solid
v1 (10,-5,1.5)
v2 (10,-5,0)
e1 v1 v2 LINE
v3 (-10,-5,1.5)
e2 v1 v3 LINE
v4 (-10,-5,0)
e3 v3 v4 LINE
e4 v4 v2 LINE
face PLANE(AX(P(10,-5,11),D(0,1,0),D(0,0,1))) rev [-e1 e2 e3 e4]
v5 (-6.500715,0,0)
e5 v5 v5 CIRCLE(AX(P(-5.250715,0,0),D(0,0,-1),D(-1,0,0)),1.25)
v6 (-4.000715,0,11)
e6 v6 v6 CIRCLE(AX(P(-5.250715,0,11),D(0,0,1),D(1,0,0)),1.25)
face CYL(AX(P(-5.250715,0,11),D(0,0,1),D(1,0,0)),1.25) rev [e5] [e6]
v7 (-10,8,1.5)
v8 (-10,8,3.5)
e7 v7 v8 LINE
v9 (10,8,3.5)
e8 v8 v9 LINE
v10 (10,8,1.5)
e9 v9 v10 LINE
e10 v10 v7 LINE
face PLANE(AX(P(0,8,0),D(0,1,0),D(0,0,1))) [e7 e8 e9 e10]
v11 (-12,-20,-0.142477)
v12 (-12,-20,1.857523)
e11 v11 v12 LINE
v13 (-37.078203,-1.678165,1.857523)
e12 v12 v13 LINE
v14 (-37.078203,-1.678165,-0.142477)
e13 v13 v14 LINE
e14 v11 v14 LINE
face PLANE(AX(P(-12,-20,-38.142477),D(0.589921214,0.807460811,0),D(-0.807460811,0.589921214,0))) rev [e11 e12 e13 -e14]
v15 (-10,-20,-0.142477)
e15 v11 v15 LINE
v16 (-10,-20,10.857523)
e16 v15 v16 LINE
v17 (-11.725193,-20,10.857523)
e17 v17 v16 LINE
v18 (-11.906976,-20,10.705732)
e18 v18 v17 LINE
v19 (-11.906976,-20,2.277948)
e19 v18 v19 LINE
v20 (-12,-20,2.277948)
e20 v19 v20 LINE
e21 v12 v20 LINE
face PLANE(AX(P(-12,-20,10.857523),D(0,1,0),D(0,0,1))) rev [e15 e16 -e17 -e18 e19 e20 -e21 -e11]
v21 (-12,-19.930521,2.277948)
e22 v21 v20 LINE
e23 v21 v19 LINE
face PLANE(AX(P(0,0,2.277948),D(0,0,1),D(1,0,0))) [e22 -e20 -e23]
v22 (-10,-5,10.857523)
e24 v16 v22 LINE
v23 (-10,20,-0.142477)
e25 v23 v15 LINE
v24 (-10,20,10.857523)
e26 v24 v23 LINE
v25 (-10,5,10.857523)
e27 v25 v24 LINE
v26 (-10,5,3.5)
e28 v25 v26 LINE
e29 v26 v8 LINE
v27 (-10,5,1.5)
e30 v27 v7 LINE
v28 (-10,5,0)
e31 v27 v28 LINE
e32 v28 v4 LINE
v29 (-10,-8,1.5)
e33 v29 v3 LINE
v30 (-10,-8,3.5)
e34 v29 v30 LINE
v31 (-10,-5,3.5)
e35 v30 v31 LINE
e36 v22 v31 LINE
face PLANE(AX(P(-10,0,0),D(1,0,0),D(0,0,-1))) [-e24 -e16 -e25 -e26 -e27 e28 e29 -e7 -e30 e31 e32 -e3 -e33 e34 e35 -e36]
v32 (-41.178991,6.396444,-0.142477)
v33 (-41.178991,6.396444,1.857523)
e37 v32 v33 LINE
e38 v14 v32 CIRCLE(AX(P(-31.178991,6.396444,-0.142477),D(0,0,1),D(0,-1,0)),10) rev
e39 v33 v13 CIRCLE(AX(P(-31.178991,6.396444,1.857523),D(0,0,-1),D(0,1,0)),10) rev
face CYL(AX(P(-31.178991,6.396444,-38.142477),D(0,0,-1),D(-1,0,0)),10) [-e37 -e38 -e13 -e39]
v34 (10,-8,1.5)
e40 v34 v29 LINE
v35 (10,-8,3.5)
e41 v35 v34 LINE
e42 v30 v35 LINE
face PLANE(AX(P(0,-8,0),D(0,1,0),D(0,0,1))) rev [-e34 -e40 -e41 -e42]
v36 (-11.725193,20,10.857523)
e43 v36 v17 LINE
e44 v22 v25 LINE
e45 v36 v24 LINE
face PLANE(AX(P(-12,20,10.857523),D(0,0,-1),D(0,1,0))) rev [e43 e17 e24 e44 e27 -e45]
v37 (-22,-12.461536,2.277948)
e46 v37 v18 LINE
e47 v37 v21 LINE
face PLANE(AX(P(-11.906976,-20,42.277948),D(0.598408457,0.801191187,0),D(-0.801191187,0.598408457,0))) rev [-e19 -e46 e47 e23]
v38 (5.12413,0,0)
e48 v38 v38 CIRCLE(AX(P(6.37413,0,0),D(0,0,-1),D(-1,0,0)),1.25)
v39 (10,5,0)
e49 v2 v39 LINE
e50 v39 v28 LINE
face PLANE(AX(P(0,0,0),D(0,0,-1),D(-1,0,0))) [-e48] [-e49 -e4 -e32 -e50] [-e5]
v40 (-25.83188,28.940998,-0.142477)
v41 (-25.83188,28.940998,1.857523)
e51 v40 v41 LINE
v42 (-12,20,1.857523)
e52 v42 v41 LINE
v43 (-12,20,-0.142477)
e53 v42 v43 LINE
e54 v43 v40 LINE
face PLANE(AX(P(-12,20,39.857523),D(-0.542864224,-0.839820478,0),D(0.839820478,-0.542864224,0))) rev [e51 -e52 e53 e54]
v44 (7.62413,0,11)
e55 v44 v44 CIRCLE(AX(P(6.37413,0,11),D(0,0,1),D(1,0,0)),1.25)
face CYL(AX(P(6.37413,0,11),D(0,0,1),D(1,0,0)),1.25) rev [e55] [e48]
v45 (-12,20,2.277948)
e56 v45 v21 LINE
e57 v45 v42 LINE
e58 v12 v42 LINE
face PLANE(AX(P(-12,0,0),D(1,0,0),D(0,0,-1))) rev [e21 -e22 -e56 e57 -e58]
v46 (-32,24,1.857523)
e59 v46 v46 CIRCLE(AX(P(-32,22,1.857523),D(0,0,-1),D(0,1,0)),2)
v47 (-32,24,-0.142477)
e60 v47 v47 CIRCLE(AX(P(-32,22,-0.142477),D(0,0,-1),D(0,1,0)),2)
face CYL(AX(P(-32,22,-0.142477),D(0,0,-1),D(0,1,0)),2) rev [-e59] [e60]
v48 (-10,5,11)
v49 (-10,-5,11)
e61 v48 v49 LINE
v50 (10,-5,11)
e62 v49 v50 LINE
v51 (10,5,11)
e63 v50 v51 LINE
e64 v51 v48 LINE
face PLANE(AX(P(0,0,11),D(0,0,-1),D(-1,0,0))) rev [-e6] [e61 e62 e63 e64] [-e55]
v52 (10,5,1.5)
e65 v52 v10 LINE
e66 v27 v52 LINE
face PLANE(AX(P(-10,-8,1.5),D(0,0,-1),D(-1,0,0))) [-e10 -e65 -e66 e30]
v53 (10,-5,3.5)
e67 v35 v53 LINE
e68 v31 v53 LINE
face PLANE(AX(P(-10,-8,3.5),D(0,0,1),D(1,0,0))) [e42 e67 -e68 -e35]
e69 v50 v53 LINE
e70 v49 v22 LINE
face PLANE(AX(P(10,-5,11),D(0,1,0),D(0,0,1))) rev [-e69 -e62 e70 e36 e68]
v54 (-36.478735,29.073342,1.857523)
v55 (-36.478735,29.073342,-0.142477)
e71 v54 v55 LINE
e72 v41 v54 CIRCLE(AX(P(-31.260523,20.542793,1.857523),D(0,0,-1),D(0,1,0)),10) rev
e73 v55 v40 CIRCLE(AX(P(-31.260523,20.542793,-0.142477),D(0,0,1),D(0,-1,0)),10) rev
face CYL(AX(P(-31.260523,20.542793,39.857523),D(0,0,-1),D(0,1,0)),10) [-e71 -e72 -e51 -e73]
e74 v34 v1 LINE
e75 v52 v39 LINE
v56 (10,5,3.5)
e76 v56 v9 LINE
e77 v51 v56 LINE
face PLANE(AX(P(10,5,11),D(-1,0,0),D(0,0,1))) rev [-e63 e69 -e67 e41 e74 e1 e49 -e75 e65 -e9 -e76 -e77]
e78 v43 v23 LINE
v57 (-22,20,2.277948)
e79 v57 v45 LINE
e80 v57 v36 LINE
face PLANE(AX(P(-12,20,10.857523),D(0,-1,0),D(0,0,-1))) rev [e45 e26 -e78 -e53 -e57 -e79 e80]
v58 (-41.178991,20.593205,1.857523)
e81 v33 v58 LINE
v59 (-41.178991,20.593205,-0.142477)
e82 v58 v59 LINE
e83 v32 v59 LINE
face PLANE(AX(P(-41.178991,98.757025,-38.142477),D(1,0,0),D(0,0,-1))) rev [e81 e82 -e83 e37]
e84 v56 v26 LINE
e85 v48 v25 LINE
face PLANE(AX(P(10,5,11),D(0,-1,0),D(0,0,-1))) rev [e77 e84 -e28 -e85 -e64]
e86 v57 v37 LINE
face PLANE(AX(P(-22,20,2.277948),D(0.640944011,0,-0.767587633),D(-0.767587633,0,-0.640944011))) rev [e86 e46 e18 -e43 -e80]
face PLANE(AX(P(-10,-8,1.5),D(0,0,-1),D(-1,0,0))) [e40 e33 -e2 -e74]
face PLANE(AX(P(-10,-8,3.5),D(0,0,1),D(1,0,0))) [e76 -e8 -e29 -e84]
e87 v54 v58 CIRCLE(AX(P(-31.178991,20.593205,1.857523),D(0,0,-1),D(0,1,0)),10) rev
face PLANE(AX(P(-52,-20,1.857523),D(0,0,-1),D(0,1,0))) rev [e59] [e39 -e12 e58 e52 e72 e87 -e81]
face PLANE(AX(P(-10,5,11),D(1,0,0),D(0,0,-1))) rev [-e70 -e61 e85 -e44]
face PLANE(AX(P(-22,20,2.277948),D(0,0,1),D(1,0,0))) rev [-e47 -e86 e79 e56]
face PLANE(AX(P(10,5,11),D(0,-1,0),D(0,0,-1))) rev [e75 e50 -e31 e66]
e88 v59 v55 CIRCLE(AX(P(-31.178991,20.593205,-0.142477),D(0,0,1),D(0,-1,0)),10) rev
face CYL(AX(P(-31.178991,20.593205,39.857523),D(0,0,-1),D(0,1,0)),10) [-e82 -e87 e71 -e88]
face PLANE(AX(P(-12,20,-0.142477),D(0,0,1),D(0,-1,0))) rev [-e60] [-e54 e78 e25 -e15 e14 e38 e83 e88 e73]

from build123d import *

# Parameters (mm, degrees)
SKETCH1_W                = 20
SKETCH1_H                = 10
BOSS_EXTRUDE1_DEPTH      = 11
BOSS_EXTRUDE2_DEPTH      = 3
BOSS_EXTRUDE2_DEPTH_BACK = 13
SKETCH2_W                = 20
SKETCH2_H                = 2
SKETCH3_W                = 11
SKETCH3_H                = 40
BOSS_EXTRUDE3_DEPTH      = 2
SKETCH5_W                = 2
SKETCH5_H                = 60
BOSS_EXTRUDE4_DEPTH      = 40
F_4_0MM_DOWEL_SLOT1_D    = 4
CUT_EXTRUDE1_DEPTH       = 40
CUT_EXTRUDE2_DEPTH       = 40
FILLET1_R                = 10
SKETCH11_W               = 53.631829023
SKETCH11_H               = 118.756200052
CUT_EXTRUDE3_DEPTH       = 40
FILLET2_R                = 10
SKETCH12_W               = 8.579575143
SKETCH12_H               = 40
BOSS_EXTRUDE5_DEPTH      = 10
CUT_EXTRUDE4_DEPTH       = 40
CUT_EXTRUDE5_DEPTH       = 40
F_2_5MM_DOWEL_SLOT1_D    = 2.5


with BuildPart() as part:
    # Sketch1 → Boss-Extrude1 (new body)
    with BuildSketch(Plane.XY):
        Rectangle(SKETCH1_W, SKETCH1_H)
    extrude(amount=BOSS_EXTRUDE1_DEPTH)

    # Sketch2 → Boss-Extrude2 (add, two sides: drawn at the far end of the back side and taken through both)
    with BuildSketch(Plane(origin=(0, 5, 0), x_dir=(1, 0, 0), z_dir=(0, 1, 0)).offset(-BOSS_EXTRUDE2_DEPTH_BACK)):
        with Locations((0, -2.5)):
            Rectangle(SKETCH2_W, SKETCH2_H)
    extrude(amount=BOSS_EXTRUDE2_DEPTH + BOSS_EXTRUDE2_DEPTH_BACK)

    # Sketch3 → Boss-Extrude3 (add)
    with BuildSketch(Plane.ZY.offset(10)):
        with Locations((5.357522791, 0)):
            Rectangle(SKETCH3_W, SKETCH3_H)
    extrude(amount=BOSS_EXTRUDE3_DEPTH)

    # Sketch5 → Boss-Extrude4 (add)
    with BuildSketch(Plane.ZY.offset(12)):
        with Locations((0.857522791, 10)):
            Rectangle(SKETCH5_W, SKETCH5_H)
    extrude(amount=BOSS_EXTRUDE4_DEPTH)

    # Ø4.0mm Dowel Slot1 (through all)
    with Locations(Plane(origin=(0, 0, -0.142477209), x_dir=(-1, 0, 0), z_dir=(0, 0, -1))):
        with Locations((32, 22)):
            Hole(F_4_0MM_DOWEL_SLOT1_D / 2)

    # Sketch9 → Cut-Extrude1 (cut)
    with BuildSketch(Plane(origin=(0, 0, -0.142477209), x_dir=(-1, 0, 0), z_dir=(0, 0, -1))):
        Polygon((12, 20), (31.113690538, 32.355186678), (52, 19.578846837), (52, 40), (12, 40), align=None)
    extrude(amount=-CUT_EXTRUDE1_DEPTH, mode=Mode.SUBTRACT)

    # Sketch10 → Cut-Extrude2 (cut)
    with BuildSketch(Plane.XY.offset(1.857522791)):
        Polygon((-12, -20), (-52, 9.223521766), (-52, -20), align=None)
    extrude(amount=-CUT_EXTRUDE2_DEPTH, mode=Mode.SUBTRACT)

    # Fillet1
    # the kernel refuses this fillet: 10 mm, written as the material it takes off along each edge
    with BuildSketch(Plane(origin=(-31.113690538, 32.355186678, -15.86551048), x_dir=(-0.8530548833247922, -0.5218212012133324, 0), z_dir=(0, 0, 1))) as fillet1_piece_1:
        with BuildLine():
            CenterArc((FILLET1_R * 0.628921330859, FILLET1_R), FILLET1_R, 205.666673807, 64.333326193)
            Line((-FILLET1_R * 0.27240777661, FILLET1_R * 0.566865101812), (0, 0))
            Line((0, 0), (FILLET1_R * 0.628921330859, 0))
        make_face()
    extrude(amount=33.446066543, mode=Mode.SUBTRACT)
    with BuildSketch(Plane(origin=(-52, 19.578846837, -14.156194501), x_dir=(0, -1, 0), z_dir=(0, 0, 1))) as fillet1_piece_2:
        with BuildLine():
            CenterArc((FILLET1_R * 0.560548691689, FILLET1_R), FILLET1_R, 211.454493545, 58.545506455)
            Line((-FILLET1_R * 0.292506191636, FILLET1_R * 0.478178798787), (0, 0))
            Line((0, 0), (FILLET1_R * 0.560548691689, 0))
        make_face()
    extrude(amount=30.027434584, mode=Mode.SUBTRACT)
    with BuildSketch(Plane(origin=(-52, 9.223521766, 14.554076611), x_dir=(0.8074608106822615, -0.5899212144111663, 0), z_dir=(0, 0, -1))) as fillet1_piece_3:
        with BuildLine():
            CenterArc((FILLET1_R * 0.507862152768, -FILLET1_R), FILLET1_R, 90, 53.848582464)
            Line((-FILLET1_R * 0.299598657914, -FILLET1_R * 0.410078785589), (0, 0))
            Line((0, 0), (FILLET1_R * 0.507862152768, 0))
        make_face()
    extrude(amount=27.393107638, mode=Mode.SUBTRACT)

    # Sketch11 → Cut-Extrude3 (cut)
    with BuildSketch(Plane.XY.offset(1.857522791)):
        with Locations((-67.994905589, 39.378925089)):
            Rectangle(SKETCH11_W, SKETCH11_H)
    extrude(amount=-CUT_EXTRUDE3_DEPTH, mode=Mode.SUBTRACT)

    # Fillet2
    # the kernel refuses this fillet: 10 mm, written as the material it takes off along each edge
    with BuildSketch(Plane(origin=(-41.178991077, 1.317822021, -12.839031028), x_dir=(0.8074608106822609, -0.589921214411167, 0), z_dir=(0, 0, 1))) as fillet2_piece_1:
        with BuildLine():
            CenterArc((FILLET2_R * 0.507862152768, FILLET2_R), FILLET2_R, 216.151417536, 53.848582464)
            Line((-FILLET2_R * 0.299598657914, FILLET2_R * 0.410078785589), (0, 0))
            Line((0, 0), (FILLET2_R * 0.507862152768, 0))
        make_face()
    extrude(amount=27.393107638, mode=Mode.SUBTRACT)
    with BuildSketch(Plane(origin=(-41.178991077, 26.198153502, 15.871240084), x_dir=(0, -1, 0), z_dir=(0, 0, -1))) as fillet2_piece_2:
        with BuildLine():
            CenterArc((FILLET2_R * 0.560548691689, -FILLET2_R), FILLET2_R, 90, 58.545506455)
            Line((-FILLET2_R * 0.292506191636, -FILLET2_R * 0.478178798787), (0, 0))
            Line((0, 0), (FILLET2_R * 0.560548691689, 0))
        make_face()
    extrude(amount=30.027434584, mode=Mode.SUBTRACT)

    # Sketch12 → Boss-Extrude5 (add)
    with BuildSketch(Plane.ZY.offset(12)):
        with Locations((6.56773522, 0)):
            Rectangle(SKETCH12_W, SKETCH12_H)
    extrude(amount=BOSS_EXTRUDE5_DEPTH)

    # Sketch13 → Cut-Extrude4 (cut)
    with BuildSketch(Plane.XZ.offset(20)):
        Polygon((-22, 2.277947648), (-11.725193368, 10.857522791), (-22, 10.857522791), align=None)
    extrude(amount=-CUT_EXTRUDE4_DEPTH, mode=Mode.SUBTRACT)

    # Sketch15 → Cut-Extrude5 (cut)
    with BuildSketch(Plane(origin=(0, 0, 2.277947648), x_dir=(-1, 0, 0), z_dir=(0, 0, -1))):
        Polygon((22, -20), (11.906976331, -20), (22, -12.461536252), align=None)
    extrude(amount=-CUT_EXTRUDE5_DEPTH, mode=Mode.SUBTRACT)

    # Ø2.5mm Dowel Slot1 (through all)
    with Locations(Plane.XY.offset(11)):
        with Locations((-5.250715138, 0), (6.374130199, 0)):
            Hole(F_2_5MM_DOWEL_SLOT1_D / 2)


solid = part.part
